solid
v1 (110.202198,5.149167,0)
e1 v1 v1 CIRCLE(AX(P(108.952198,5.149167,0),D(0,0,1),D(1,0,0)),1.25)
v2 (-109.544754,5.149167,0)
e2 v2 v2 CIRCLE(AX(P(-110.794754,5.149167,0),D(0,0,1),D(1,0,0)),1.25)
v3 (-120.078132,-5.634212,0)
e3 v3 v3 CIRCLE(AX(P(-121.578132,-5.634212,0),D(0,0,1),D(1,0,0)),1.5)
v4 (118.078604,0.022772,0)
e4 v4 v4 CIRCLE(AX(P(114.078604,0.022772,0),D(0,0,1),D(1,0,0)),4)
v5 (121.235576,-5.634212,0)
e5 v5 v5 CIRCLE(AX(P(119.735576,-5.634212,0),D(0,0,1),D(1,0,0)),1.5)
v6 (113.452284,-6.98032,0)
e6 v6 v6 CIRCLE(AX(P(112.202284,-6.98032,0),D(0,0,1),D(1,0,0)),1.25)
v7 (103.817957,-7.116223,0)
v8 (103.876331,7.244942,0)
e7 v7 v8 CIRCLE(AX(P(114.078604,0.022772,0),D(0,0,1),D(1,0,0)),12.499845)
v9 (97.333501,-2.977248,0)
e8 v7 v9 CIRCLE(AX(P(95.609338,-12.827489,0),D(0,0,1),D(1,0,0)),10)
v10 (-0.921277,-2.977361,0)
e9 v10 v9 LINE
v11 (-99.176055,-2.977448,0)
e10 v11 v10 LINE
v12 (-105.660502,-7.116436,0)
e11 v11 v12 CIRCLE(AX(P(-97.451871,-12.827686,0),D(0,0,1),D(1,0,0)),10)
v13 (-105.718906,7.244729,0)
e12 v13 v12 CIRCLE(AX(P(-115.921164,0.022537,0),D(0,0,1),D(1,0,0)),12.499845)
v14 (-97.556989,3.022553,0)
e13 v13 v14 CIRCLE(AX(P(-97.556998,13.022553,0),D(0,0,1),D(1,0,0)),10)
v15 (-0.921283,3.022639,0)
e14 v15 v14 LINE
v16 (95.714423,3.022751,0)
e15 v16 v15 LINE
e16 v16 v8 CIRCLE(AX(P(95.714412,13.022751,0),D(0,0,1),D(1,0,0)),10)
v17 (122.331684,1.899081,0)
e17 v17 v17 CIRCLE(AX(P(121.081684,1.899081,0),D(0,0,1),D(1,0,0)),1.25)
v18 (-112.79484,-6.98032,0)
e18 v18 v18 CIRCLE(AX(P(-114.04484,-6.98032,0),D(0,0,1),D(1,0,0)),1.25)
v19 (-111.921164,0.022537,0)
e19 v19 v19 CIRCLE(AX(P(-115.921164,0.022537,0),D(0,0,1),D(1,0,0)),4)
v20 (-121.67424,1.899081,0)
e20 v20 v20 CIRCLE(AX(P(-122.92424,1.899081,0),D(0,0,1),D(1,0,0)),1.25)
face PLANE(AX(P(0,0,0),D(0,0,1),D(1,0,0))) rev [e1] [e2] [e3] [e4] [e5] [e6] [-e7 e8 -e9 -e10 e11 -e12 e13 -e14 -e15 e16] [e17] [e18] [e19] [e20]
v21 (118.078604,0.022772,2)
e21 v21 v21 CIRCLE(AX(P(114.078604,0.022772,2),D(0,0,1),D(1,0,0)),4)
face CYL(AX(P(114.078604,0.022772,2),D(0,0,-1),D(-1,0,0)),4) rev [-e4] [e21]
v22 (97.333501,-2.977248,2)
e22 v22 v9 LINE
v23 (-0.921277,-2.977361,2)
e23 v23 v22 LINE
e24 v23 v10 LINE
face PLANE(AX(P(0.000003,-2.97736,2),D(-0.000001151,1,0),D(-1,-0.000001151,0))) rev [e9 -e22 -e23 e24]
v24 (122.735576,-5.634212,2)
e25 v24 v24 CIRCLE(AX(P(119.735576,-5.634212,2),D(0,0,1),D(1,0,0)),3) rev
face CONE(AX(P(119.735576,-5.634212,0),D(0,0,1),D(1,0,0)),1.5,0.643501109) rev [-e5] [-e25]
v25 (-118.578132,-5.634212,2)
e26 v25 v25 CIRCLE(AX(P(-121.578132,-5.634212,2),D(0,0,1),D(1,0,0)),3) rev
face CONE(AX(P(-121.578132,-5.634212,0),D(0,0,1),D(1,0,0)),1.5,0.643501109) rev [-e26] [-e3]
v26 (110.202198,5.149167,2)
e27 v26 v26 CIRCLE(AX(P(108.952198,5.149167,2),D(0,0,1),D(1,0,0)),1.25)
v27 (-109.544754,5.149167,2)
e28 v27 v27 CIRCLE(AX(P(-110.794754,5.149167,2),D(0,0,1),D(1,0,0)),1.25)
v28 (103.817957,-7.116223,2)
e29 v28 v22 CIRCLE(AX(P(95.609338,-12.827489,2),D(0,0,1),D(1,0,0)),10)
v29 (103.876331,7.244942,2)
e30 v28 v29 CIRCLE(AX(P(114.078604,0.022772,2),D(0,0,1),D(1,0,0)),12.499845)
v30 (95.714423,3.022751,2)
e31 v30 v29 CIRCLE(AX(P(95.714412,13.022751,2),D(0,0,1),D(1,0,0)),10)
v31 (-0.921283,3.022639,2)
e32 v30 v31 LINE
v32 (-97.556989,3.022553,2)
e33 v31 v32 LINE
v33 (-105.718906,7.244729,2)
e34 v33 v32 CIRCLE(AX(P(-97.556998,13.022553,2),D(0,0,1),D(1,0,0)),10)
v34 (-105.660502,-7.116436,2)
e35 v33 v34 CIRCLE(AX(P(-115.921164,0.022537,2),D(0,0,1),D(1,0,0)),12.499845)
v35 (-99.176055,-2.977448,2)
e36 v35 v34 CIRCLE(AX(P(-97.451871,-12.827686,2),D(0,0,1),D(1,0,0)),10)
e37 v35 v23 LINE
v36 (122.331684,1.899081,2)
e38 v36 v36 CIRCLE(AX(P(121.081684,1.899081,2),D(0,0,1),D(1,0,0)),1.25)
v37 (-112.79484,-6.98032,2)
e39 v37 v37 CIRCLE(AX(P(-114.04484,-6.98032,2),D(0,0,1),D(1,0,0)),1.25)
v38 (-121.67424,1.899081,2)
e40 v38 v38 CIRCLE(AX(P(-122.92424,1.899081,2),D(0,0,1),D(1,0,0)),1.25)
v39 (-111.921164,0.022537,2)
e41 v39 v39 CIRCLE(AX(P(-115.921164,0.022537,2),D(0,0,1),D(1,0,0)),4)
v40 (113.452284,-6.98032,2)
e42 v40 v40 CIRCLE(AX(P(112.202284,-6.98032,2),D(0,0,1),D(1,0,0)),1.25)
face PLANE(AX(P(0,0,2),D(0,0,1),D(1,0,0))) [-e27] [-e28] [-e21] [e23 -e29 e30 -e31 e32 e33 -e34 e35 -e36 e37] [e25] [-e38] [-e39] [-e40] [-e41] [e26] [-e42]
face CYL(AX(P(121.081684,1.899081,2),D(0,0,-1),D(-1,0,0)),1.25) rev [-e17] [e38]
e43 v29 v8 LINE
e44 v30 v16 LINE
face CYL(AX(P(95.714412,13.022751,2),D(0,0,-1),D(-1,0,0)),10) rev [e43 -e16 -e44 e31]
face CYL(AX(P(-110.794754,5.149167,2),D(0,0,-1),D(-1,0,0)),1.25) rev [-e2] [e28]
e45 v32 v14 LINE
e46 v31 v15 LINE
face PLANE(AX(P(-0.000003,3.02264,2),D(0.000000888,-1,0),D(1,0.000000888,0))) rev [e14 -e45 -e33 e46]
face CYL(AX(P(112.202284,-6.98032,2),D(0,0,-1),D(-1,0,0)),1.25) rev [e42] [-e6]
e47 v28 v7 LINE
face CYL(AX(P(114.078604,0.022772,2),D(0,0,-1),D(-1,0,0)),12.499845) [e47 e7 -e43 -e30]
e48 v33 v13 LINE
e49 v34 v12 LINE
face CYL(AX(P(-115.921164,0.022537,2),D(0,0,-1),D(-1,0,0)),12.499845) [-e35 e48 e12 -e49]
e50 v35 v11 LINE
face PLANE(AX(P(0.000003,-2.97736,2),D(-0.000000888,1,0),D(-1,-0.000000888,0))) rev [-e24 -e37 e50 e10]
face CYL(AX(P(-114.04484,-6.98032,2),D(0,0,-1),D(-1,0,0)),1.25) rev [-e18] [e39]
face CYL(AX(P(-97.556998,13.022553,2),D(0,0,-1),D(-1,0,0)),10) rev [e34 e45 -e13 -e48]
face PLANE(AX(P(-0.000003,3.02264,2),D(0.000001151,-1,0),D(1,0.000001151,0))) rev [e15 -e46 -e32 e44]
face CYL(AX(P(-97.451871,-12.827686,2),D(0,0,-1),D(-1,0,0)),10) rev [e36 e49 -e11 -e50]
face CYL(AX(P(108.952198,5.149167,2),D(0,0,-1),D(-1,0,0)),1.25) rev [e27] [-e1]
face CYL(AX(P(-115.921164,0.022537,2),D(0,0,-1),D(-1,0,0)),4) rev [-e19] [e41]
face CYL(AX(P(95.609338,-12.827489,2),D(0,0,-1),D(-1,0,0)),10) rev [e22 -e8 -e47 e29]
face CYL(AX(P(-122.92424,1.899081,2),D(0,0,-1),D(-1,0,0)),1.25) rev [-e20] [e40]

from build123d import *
from OCP.BRepFilletAPI import BRepFilletAPI_MakeChamfer

# Parameters (mm, degrees)
SKETCH_1_R       = 3
SKETCH_1_R_2     = 4
SKETCH_1_R_3     = 1.25
SKETCH_1_R_4     = 1.5
EXTRUDE_1_DEPTH  = 2
CHAMFER_1_SIZE   = 1.5
CHAMFER_1_SIZE_2 = 2


with BuildPart() as part:
    # 草图1 → 凸台-拉伸1 (new body)
    # profile 1 of 3: a face of its own
    with BuildSketch(Plane.XY):
        with BuildLine():
            ThreePointArc((-105.718905787, 7.244728588), (-102.151651286, 4.140596435), (-97.556989056, 3.022553461))
            Line((-97.556989056, 3.022553461), (-0.921282848, 3.022639283))
            Line((-0.921282848, 3.022639283), (95.714423361, 3.022750547))
            ThreePointArc((95.714423361, 3.022750547), (100.30908331, 4.140802892), (103.87633148, 7.24494232))
            ThreePointArc((103.87633148, 7.24494232), (126.57834594, -0.028036342), (103.817957269, -7.116222762))
            ThreePointArc((103.817957269, -7.116222762), (100.989655875, -4.398243929), (97.333501186, -2.977247589))
            Line((97.333501186, -2.977247589), (-0.921276729, -2.977360717))
            Line((-0.921276729, -2.977360717), (-99.176054645, -2.977447977))
            ThreePointArc((-99.176054645, -2.977447977), (-102.832206436, -4.398451774), (-105.660502287, -7.116436375))
            ThreePointArc((-105.660502287, -7.116436375), (-128.420905414, -0.028296374), (-105.718905787, 7.244728588))
        make_face()
        with Locations((-121.57813209, -5.634211545)):
            Circle(SKETCH_1_R, mode=Mode.SUBTRACT)
        with Locations((-115.921163949, 0.022537151)):
            Circle(SKETCH_1_R_2, mode=Mode.SUBTRACT)
        with Locations((119.735576409, -5.634211545)):
            Circle(SKETCH_1_R, mode=Mode.SUBTRACT)
        with Locations((112.202284082, -6.980319536)):
            Circle(SKETCH_1_R_3, mode=Mode.SUBTRACT)
        with Locations((114.078604371, 0.022771691)):
            Circle(SKETCH_1_R_2, mode=Mode.SUBTRACT)
        with Locations((-110.794753677, 5.149166868)):
            Circle(SKETCH_1_R_3, mode=Mode.SUBTRACT)
        with Locations((-122.924240081, 1.899080781)):
            Circle(SKETCH_1_R_3, mode=Mode.SUBTRACT)
        with Locations((121.0816844, 1.899080781)):
            Circle(SKETCH_1_R_3, mode=Mode.SUBTRACT)
        with Locations((-114.044839764, -6.980319536)):
            Circle(SKETCH_1_R_3, mode=Mode.SUBTRACT)
        with Locations((108.952197996, 5.149166868)):
            Circle(SKETCH_1_R_3, mode=Mode.SUBTRACT)
    # profile 2 of 3: a face of its own
    with BuildSketch(Plane.XY):
        with Locations((-121.57813209, -5.634211545)):
            Circle(SKETCH_1_R)
        with Locations((-121.57813209, -5.634211545)):
            Circle(SKETCH_1_R_4, mode=Mode.SUBTRACT)
    # profile 3 of 3: a face of its own
    with BuildSketch(Plane.XY):
        with Locations((119.735576409, -5.634211545)):
            Circle(SKETCH_1_R)
        with Locations((119.735576409, -5.634211545)):
            Circle(SKETCH_1_R_4, mode=Mode.SUBTRACT)
    extrude(amount=EXTRUDE_1_DEPTH)

    # 倒角1
    chamfer_1_edges_1 = [part.edges().sort_by_distance(p)[0] for p in [
        (118.235576409, -5.634211545, 2),
    ]]
    chamfer_1_side_1 = [part.faces().sort_by_distance(p)[0] for p in [
        (118.205576409, -5.634211545, 2),
    ]]
    chamfer_1_edges_2 = [part.edges().sort_by_distance(p)[0] for p in [
        (-123.07813209, -5.634211545, 2),
    ]]
    chamfer_1_side_2 = [part.faces().sort_by_distance(p)[0] for p in [
        (-123.10813209, -5.634211545, 2),
    ]]
    chamfer_1 = BRepFilletAPI_MakeChamfer(part.part.solid().wrapped)
    for e in chamfer_1_edges_1:
        chamfer_1.Add(CHAMFER_1_SIZE - 0.0001, CHAMFER_1_SIZE_2 - 0.0001, e.wrapped, chamfer_1_side_1[0].wrapped)
    for e in chamfer_1_edges_2:
        chamfer_1.Add(CHAMFER_1_SIZE - 0.0001, CHAMFER_1_SIZE_2 - 0.0001, e.wrapped, chamfer_1_side_2[0].wrapped)
    add(Compound.cast(chamfer_1.Shape()), mode=Mode.REPLACE)  # a hair under: the kernel refuses the full size


solid = part.part
